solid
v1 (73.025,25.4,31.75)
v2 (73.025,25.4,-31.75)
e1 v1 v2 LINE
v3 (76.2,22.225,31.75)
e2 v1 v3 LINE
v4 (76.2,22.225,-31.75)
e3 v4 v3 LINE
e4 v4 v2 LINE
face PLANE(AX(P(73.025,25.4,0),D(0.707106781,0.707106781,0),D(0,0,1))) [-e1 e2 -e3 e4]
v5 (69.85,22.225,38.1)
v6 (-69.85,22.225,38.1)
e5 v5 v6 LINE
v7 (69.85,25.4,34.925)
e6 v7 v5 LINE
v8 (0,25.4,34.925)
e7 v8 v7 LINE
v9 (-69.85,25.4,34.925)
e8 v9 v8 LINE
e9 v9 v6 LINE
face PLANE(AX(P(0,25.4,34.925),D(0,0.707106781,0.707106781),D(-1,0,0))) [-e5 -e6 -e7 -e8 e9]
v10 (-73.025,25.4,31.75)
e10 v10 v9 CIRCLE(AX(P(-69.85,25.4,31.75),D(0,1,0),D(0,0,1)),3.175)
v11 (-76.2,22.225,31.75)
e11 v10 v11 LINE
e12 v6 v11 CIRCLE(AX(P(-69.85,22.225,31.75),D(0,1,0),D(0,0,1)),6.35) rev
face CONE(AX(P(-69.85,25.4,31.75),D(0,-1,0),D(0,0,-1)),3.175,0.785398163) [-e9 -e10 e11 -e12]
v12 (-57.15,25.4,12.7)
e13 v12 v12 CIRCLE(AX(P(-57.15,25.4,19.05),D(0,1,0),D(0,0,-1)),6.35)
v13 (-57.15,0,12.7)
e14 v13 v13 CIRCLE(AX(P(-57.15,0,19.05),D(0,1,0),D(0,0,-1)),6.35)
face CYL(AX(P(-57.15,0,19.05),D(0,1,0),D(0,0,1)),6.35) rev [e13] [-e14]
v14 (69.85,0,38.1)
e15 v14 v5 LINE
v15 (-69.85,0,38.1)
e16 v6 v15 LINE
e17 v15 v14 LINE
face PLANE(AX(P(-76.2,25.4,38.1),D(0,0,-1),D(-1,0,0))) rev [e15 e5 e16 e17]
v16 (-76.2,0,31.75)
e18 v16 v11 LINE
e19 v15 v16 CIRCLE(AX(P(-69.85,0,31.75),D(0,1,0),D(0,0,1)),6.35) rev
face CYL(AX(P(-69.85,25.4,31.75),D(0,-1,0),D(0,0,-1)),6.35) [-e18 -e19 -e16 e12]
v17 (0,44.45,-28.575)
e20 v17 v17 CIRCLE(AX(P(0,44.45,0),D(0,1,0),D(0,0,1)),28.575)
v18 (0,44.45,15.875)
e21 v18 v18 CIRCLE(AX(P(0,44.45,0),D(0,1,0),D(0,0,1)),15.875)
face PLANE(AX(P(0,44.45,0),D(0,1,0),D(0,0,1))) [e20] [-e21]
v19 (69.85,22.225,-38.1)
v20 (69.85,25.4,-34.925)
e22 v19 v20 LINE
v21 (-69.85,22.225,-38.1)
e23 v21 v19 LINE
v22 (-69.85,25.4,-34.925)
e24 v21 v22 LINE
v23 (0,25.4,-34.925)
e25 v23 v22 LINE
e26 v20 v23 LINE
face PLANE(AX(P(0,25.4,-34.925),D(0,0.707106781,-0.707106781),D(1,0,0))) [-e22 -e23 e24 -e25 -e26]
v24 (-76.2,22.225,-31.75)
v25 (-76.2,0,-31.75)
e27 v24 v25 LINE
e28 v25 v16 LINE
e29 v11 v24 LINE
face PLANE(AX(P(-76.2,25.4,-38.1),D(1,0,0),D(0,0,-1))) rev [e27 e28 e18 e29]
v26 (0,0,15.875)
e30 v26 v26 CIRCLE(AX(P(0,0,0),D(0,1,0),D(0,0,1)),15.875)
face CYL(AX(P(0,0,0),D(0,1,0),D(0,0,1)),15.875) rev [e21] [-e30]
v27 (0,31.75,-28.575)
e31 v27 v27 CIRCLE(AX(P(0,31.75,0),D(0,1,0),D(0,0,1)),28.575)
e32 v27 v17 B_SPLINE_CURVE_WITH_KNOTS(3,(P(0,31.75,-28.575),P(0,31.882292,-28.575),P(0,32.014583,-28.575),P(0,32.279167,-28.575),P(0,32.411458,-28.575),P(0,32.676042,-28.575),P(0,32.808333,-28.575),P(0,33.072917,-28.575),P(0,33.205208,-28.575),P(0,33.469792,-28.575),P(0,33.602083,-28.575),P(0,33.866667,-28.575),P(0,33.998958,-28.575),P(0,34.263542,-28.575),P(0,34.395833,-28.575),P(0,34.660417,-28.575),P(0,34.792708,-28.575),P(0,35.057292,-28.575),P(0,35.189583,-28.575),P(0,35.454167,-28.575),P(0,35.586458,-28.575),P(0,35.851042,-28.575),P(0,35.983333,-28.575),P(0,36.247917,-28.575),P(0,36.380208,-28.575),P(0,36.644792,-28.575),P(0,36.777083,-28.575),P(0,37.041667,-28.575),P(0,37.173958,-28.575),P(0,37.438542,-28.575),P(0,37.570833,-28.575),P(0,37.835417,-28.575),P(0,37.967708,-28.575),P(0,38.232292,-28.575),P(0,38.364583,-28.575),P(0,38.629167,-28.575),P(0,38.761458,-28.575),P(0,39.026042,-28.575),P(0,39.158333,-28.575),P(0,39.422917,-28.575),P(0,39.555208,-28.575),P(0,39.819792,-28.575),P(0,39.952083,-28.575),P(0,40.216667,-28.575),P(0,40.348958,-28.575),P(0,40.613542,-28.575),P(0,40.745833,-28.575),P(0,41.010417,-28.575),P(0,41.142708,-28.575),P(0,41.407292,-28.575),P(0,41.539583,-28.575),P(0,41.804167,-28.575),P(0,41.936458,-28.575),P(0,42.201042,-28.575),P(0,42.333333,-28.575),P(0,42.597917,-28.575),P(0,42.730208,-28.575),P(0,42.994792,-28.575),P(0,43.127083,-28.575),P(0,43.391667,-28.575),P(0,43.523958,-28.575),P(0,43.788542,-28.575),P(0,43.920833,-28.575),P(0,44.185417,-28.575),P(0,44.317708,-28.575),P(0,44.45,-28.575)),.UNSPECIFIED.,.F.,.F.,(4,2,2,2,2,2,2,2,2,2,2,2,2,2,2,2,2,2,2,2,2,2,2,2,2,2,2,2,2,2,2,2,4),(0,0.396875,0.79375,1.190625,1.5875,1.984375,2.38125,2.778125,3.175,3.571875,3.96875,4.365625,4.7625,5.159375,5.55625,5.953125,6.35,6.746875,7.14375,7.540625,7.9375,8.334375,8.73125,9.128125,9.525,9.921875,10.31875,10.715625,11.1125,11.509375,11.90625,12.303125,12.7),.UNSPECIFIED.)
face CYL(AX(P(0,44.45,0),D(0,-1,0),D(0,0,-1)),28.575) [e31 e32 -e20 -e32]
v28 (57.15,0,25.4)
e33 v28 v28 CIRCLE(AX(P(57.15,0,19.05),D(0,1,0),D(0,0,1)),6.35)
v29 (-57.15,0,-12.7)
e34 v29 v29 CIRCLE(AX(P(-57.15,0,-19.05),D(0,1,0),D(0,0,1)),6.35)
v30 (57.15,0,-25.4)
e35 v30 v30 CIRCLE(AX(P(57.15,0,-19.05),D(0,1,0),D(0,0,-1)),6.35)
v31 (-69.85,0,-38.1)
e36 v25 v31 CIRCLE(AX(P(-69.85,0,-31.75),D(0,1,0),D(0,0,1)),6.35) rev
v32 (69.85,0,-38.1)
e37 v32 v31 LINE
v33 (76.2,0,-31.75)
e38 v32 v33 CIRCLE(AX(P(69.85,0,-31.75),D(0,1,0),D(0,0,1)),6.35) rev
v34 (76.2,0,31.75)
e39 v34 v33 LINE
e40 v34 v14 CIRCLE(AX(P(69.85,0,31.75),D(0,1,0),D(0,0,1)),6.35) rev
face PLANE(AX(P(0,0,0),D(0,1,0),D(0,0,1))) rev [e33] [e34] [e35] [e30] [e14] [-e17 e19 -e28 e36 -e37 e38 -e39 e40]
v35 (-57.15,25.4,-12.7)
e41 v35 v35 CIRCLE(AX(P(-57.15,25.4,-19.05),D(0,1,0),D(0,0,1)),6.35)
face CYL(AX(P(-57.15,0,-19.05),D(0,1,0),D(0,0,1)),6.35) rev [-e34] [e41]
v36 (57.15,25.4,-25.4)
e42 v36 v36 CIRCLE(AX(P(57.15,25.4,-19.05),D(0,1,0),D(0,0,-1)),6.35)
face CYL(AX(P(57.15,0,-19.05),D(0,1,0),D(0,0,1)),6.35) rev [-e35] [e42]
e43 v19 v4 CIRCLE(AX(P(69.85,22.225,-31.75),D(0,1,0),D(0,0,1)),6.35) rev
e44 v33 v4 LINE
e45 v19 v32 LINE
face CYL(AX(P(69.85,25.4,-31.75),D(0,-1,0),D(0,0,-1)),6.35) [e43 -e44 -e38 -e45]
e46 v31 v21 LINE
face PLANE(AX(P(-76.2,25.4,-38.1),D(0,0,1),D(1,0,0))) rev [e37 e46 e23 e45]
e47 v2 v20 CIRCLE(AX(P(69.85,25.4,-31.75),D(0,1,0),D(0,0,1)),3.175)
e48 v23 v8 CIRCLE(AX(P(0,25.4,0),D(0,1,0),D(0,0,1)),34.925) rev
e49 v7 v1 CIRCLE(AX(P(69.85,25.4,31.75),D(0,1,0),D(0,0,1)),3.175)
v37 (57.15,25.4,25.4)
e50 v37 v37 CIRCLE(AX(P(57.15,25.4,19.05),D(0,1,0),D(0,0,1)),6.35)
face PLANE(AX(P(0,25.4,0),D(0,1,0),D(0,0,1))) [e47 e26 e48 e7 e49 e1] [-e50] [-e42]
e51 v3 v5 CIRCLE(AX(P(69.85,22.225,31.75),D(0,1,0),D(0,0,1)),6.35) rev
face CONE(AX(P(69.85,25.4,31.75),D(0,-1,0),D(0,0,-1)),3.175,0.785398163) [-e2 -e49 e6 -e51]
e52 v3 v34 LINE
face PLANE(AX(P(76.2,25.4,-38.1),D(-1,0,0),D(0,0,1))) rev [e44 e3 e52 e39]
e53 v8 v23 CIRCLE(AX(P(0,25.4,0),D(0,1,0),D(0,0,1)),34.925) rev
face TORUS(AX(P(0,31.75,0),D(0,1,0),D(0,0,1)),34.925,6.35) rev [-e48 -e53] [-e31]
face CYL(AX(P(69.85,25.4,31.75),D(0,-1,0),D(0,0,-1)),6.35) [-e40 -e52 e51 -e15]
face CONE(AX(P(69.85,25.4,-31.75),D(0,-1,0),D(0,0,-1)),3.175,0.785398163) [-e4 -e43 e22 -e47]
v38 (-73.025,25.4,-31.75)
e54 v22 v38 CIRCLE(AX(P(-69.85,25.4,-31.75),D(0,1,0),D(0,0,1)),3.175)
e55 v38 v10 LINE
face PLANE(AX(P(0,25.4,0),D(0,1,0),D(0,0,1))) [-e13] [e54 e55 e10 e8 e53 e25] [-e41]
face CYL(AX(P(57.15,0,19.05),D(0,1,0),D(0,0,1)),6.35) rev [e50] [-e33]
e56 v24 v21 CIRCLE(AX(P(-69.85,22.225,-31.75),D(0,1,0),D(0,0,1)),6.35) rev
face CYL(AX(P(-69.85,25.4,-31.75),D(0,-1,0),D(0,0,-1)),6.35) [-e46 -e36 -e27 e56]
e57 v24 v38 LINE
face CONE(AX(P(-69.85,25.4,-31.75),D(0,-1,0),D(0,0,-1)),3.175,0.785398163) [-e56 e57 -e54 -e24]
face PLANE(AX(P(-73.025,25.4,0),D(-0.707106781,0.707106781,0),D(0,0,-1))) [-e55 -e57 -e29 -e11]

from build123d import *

# Parameters (mm, degrees)
SKETCH1_W           = 152.4
SKETCH1_H           = 76.2
BOSS_EXTRUDE1_DEPTH = 25.4
SKETCH2_R           = 6.35
CUT_EXTRUDE1_DEPTH  = 89.9
SKETCH3_R           = 28.575
BOSS_EXTRUDE2_DEPTH = 19.05
SKETCH4_R           = 15.875
CUT_EXTRUDE3_DEPTH  = 97.092936785
FILLET1_R           = 6.35
CHAMFER1_SIZE       = 3.175


with BuildPart() as part:
    # Sketch1 → Boss-Extrude1 (new body)
    with BuildSketch(Plane(origin=(0, 0, 0), x_dir=(1, 0, 0), z_dir=(0, 1, 0))):
        Rectangle(SKETCH1_W, SKETCH1_H)
    extrude(amount=BOSS_EXTRUDE1_DEPTH)

    # Sketch2 → Cut-Extrude1 (cut, through all)
    with BuildSketch(Plane(origin=(0, 25.4, 0), x_dir=(1, 0, 0), z_dir=(0, 1, 0))):
        with Locations(Location((-57.15, 19.05, 0), (0, 0, 270))):
            Circle(SKETCH2_R)
        with Locations(Location((-57.15, -19.05, 0), (0, 0, 90))):
            Circle(SKETCH2_R)
        with Locations(Location((57.15, -19.05, 0), (0, 0, 270))):
            Circle(SKETCH2_R)
        with Locations(Location((57.15, 19.05, 0), (0, 0, 90))):
            Circle(SKETCH2_R)
    extrude(amount=-CUT_EXTRUDE1_DEPTH, mode=Mode.SUBTRACT)

    # Sketch3 → Boss-Extrude2 (add)
    with BuildSketch(Plane(origin=(0, 25.4, 0), x_dir=(1, 0, 0), z_dir=(0, 1, 0))):
        with Locations(Location((0, 0, 0), (0, 0, 90))):
            Circle(SKETCH3_R)
    extrude(amount=BOSS_EXTRUDE2_DEPTH)

    # Sketch4 → Cut-Extrude3 (cut, through all)
    with BuildSketch(Plane(origin=(0, 44.45, 0), x_dir=(1, 0, 0), z_dir=(0, 1, 0))):
        with Locations(Location((0, 0, 0), (0, 0, 270))):
            Circle(SKETCH4_R)
    extrude(amount=-CUT_EXTRUDE3_DEPTH, mode=Mode.SUBTRACT)

    # Fillet1
    fillet1_edges = [part.edges().sort_by_distance(p)[0] for p in [
        (0, 25.4, 28.575),
        (76.2, 12.7, 38.1),
        (-76.2, 12.7, 38.1),
        (-76.2, 12.7, -38.1),
        (76.2, 12.7, -38.1),
    ]]
    fillet(fillet1_edges, radius=FILLET1_R)

    # Chamfer1
    chamfer1_edges = [part.edges().sort_by_distance(p)[0] for p in [
        (76.2, 25.4, 0),
        (0, 25.4, -38.1),
        (-76.2, 25.4, 0),
        (0, 25.4, 38.1),
        (-74.340128061, 25.4, 36.240128061),
        (74.340128061, 25.4, 36.240128061),
        (74.340128061, 25.4, -36.240128061),
        (-74.340128061, 25.4, -36.240128061),
    ]]
    chamfer(chamfer1_edges, length=CHAMFER1_SIZE - 0.0001)  # a hair under: the kernel refuses the full size


solid = part.part
